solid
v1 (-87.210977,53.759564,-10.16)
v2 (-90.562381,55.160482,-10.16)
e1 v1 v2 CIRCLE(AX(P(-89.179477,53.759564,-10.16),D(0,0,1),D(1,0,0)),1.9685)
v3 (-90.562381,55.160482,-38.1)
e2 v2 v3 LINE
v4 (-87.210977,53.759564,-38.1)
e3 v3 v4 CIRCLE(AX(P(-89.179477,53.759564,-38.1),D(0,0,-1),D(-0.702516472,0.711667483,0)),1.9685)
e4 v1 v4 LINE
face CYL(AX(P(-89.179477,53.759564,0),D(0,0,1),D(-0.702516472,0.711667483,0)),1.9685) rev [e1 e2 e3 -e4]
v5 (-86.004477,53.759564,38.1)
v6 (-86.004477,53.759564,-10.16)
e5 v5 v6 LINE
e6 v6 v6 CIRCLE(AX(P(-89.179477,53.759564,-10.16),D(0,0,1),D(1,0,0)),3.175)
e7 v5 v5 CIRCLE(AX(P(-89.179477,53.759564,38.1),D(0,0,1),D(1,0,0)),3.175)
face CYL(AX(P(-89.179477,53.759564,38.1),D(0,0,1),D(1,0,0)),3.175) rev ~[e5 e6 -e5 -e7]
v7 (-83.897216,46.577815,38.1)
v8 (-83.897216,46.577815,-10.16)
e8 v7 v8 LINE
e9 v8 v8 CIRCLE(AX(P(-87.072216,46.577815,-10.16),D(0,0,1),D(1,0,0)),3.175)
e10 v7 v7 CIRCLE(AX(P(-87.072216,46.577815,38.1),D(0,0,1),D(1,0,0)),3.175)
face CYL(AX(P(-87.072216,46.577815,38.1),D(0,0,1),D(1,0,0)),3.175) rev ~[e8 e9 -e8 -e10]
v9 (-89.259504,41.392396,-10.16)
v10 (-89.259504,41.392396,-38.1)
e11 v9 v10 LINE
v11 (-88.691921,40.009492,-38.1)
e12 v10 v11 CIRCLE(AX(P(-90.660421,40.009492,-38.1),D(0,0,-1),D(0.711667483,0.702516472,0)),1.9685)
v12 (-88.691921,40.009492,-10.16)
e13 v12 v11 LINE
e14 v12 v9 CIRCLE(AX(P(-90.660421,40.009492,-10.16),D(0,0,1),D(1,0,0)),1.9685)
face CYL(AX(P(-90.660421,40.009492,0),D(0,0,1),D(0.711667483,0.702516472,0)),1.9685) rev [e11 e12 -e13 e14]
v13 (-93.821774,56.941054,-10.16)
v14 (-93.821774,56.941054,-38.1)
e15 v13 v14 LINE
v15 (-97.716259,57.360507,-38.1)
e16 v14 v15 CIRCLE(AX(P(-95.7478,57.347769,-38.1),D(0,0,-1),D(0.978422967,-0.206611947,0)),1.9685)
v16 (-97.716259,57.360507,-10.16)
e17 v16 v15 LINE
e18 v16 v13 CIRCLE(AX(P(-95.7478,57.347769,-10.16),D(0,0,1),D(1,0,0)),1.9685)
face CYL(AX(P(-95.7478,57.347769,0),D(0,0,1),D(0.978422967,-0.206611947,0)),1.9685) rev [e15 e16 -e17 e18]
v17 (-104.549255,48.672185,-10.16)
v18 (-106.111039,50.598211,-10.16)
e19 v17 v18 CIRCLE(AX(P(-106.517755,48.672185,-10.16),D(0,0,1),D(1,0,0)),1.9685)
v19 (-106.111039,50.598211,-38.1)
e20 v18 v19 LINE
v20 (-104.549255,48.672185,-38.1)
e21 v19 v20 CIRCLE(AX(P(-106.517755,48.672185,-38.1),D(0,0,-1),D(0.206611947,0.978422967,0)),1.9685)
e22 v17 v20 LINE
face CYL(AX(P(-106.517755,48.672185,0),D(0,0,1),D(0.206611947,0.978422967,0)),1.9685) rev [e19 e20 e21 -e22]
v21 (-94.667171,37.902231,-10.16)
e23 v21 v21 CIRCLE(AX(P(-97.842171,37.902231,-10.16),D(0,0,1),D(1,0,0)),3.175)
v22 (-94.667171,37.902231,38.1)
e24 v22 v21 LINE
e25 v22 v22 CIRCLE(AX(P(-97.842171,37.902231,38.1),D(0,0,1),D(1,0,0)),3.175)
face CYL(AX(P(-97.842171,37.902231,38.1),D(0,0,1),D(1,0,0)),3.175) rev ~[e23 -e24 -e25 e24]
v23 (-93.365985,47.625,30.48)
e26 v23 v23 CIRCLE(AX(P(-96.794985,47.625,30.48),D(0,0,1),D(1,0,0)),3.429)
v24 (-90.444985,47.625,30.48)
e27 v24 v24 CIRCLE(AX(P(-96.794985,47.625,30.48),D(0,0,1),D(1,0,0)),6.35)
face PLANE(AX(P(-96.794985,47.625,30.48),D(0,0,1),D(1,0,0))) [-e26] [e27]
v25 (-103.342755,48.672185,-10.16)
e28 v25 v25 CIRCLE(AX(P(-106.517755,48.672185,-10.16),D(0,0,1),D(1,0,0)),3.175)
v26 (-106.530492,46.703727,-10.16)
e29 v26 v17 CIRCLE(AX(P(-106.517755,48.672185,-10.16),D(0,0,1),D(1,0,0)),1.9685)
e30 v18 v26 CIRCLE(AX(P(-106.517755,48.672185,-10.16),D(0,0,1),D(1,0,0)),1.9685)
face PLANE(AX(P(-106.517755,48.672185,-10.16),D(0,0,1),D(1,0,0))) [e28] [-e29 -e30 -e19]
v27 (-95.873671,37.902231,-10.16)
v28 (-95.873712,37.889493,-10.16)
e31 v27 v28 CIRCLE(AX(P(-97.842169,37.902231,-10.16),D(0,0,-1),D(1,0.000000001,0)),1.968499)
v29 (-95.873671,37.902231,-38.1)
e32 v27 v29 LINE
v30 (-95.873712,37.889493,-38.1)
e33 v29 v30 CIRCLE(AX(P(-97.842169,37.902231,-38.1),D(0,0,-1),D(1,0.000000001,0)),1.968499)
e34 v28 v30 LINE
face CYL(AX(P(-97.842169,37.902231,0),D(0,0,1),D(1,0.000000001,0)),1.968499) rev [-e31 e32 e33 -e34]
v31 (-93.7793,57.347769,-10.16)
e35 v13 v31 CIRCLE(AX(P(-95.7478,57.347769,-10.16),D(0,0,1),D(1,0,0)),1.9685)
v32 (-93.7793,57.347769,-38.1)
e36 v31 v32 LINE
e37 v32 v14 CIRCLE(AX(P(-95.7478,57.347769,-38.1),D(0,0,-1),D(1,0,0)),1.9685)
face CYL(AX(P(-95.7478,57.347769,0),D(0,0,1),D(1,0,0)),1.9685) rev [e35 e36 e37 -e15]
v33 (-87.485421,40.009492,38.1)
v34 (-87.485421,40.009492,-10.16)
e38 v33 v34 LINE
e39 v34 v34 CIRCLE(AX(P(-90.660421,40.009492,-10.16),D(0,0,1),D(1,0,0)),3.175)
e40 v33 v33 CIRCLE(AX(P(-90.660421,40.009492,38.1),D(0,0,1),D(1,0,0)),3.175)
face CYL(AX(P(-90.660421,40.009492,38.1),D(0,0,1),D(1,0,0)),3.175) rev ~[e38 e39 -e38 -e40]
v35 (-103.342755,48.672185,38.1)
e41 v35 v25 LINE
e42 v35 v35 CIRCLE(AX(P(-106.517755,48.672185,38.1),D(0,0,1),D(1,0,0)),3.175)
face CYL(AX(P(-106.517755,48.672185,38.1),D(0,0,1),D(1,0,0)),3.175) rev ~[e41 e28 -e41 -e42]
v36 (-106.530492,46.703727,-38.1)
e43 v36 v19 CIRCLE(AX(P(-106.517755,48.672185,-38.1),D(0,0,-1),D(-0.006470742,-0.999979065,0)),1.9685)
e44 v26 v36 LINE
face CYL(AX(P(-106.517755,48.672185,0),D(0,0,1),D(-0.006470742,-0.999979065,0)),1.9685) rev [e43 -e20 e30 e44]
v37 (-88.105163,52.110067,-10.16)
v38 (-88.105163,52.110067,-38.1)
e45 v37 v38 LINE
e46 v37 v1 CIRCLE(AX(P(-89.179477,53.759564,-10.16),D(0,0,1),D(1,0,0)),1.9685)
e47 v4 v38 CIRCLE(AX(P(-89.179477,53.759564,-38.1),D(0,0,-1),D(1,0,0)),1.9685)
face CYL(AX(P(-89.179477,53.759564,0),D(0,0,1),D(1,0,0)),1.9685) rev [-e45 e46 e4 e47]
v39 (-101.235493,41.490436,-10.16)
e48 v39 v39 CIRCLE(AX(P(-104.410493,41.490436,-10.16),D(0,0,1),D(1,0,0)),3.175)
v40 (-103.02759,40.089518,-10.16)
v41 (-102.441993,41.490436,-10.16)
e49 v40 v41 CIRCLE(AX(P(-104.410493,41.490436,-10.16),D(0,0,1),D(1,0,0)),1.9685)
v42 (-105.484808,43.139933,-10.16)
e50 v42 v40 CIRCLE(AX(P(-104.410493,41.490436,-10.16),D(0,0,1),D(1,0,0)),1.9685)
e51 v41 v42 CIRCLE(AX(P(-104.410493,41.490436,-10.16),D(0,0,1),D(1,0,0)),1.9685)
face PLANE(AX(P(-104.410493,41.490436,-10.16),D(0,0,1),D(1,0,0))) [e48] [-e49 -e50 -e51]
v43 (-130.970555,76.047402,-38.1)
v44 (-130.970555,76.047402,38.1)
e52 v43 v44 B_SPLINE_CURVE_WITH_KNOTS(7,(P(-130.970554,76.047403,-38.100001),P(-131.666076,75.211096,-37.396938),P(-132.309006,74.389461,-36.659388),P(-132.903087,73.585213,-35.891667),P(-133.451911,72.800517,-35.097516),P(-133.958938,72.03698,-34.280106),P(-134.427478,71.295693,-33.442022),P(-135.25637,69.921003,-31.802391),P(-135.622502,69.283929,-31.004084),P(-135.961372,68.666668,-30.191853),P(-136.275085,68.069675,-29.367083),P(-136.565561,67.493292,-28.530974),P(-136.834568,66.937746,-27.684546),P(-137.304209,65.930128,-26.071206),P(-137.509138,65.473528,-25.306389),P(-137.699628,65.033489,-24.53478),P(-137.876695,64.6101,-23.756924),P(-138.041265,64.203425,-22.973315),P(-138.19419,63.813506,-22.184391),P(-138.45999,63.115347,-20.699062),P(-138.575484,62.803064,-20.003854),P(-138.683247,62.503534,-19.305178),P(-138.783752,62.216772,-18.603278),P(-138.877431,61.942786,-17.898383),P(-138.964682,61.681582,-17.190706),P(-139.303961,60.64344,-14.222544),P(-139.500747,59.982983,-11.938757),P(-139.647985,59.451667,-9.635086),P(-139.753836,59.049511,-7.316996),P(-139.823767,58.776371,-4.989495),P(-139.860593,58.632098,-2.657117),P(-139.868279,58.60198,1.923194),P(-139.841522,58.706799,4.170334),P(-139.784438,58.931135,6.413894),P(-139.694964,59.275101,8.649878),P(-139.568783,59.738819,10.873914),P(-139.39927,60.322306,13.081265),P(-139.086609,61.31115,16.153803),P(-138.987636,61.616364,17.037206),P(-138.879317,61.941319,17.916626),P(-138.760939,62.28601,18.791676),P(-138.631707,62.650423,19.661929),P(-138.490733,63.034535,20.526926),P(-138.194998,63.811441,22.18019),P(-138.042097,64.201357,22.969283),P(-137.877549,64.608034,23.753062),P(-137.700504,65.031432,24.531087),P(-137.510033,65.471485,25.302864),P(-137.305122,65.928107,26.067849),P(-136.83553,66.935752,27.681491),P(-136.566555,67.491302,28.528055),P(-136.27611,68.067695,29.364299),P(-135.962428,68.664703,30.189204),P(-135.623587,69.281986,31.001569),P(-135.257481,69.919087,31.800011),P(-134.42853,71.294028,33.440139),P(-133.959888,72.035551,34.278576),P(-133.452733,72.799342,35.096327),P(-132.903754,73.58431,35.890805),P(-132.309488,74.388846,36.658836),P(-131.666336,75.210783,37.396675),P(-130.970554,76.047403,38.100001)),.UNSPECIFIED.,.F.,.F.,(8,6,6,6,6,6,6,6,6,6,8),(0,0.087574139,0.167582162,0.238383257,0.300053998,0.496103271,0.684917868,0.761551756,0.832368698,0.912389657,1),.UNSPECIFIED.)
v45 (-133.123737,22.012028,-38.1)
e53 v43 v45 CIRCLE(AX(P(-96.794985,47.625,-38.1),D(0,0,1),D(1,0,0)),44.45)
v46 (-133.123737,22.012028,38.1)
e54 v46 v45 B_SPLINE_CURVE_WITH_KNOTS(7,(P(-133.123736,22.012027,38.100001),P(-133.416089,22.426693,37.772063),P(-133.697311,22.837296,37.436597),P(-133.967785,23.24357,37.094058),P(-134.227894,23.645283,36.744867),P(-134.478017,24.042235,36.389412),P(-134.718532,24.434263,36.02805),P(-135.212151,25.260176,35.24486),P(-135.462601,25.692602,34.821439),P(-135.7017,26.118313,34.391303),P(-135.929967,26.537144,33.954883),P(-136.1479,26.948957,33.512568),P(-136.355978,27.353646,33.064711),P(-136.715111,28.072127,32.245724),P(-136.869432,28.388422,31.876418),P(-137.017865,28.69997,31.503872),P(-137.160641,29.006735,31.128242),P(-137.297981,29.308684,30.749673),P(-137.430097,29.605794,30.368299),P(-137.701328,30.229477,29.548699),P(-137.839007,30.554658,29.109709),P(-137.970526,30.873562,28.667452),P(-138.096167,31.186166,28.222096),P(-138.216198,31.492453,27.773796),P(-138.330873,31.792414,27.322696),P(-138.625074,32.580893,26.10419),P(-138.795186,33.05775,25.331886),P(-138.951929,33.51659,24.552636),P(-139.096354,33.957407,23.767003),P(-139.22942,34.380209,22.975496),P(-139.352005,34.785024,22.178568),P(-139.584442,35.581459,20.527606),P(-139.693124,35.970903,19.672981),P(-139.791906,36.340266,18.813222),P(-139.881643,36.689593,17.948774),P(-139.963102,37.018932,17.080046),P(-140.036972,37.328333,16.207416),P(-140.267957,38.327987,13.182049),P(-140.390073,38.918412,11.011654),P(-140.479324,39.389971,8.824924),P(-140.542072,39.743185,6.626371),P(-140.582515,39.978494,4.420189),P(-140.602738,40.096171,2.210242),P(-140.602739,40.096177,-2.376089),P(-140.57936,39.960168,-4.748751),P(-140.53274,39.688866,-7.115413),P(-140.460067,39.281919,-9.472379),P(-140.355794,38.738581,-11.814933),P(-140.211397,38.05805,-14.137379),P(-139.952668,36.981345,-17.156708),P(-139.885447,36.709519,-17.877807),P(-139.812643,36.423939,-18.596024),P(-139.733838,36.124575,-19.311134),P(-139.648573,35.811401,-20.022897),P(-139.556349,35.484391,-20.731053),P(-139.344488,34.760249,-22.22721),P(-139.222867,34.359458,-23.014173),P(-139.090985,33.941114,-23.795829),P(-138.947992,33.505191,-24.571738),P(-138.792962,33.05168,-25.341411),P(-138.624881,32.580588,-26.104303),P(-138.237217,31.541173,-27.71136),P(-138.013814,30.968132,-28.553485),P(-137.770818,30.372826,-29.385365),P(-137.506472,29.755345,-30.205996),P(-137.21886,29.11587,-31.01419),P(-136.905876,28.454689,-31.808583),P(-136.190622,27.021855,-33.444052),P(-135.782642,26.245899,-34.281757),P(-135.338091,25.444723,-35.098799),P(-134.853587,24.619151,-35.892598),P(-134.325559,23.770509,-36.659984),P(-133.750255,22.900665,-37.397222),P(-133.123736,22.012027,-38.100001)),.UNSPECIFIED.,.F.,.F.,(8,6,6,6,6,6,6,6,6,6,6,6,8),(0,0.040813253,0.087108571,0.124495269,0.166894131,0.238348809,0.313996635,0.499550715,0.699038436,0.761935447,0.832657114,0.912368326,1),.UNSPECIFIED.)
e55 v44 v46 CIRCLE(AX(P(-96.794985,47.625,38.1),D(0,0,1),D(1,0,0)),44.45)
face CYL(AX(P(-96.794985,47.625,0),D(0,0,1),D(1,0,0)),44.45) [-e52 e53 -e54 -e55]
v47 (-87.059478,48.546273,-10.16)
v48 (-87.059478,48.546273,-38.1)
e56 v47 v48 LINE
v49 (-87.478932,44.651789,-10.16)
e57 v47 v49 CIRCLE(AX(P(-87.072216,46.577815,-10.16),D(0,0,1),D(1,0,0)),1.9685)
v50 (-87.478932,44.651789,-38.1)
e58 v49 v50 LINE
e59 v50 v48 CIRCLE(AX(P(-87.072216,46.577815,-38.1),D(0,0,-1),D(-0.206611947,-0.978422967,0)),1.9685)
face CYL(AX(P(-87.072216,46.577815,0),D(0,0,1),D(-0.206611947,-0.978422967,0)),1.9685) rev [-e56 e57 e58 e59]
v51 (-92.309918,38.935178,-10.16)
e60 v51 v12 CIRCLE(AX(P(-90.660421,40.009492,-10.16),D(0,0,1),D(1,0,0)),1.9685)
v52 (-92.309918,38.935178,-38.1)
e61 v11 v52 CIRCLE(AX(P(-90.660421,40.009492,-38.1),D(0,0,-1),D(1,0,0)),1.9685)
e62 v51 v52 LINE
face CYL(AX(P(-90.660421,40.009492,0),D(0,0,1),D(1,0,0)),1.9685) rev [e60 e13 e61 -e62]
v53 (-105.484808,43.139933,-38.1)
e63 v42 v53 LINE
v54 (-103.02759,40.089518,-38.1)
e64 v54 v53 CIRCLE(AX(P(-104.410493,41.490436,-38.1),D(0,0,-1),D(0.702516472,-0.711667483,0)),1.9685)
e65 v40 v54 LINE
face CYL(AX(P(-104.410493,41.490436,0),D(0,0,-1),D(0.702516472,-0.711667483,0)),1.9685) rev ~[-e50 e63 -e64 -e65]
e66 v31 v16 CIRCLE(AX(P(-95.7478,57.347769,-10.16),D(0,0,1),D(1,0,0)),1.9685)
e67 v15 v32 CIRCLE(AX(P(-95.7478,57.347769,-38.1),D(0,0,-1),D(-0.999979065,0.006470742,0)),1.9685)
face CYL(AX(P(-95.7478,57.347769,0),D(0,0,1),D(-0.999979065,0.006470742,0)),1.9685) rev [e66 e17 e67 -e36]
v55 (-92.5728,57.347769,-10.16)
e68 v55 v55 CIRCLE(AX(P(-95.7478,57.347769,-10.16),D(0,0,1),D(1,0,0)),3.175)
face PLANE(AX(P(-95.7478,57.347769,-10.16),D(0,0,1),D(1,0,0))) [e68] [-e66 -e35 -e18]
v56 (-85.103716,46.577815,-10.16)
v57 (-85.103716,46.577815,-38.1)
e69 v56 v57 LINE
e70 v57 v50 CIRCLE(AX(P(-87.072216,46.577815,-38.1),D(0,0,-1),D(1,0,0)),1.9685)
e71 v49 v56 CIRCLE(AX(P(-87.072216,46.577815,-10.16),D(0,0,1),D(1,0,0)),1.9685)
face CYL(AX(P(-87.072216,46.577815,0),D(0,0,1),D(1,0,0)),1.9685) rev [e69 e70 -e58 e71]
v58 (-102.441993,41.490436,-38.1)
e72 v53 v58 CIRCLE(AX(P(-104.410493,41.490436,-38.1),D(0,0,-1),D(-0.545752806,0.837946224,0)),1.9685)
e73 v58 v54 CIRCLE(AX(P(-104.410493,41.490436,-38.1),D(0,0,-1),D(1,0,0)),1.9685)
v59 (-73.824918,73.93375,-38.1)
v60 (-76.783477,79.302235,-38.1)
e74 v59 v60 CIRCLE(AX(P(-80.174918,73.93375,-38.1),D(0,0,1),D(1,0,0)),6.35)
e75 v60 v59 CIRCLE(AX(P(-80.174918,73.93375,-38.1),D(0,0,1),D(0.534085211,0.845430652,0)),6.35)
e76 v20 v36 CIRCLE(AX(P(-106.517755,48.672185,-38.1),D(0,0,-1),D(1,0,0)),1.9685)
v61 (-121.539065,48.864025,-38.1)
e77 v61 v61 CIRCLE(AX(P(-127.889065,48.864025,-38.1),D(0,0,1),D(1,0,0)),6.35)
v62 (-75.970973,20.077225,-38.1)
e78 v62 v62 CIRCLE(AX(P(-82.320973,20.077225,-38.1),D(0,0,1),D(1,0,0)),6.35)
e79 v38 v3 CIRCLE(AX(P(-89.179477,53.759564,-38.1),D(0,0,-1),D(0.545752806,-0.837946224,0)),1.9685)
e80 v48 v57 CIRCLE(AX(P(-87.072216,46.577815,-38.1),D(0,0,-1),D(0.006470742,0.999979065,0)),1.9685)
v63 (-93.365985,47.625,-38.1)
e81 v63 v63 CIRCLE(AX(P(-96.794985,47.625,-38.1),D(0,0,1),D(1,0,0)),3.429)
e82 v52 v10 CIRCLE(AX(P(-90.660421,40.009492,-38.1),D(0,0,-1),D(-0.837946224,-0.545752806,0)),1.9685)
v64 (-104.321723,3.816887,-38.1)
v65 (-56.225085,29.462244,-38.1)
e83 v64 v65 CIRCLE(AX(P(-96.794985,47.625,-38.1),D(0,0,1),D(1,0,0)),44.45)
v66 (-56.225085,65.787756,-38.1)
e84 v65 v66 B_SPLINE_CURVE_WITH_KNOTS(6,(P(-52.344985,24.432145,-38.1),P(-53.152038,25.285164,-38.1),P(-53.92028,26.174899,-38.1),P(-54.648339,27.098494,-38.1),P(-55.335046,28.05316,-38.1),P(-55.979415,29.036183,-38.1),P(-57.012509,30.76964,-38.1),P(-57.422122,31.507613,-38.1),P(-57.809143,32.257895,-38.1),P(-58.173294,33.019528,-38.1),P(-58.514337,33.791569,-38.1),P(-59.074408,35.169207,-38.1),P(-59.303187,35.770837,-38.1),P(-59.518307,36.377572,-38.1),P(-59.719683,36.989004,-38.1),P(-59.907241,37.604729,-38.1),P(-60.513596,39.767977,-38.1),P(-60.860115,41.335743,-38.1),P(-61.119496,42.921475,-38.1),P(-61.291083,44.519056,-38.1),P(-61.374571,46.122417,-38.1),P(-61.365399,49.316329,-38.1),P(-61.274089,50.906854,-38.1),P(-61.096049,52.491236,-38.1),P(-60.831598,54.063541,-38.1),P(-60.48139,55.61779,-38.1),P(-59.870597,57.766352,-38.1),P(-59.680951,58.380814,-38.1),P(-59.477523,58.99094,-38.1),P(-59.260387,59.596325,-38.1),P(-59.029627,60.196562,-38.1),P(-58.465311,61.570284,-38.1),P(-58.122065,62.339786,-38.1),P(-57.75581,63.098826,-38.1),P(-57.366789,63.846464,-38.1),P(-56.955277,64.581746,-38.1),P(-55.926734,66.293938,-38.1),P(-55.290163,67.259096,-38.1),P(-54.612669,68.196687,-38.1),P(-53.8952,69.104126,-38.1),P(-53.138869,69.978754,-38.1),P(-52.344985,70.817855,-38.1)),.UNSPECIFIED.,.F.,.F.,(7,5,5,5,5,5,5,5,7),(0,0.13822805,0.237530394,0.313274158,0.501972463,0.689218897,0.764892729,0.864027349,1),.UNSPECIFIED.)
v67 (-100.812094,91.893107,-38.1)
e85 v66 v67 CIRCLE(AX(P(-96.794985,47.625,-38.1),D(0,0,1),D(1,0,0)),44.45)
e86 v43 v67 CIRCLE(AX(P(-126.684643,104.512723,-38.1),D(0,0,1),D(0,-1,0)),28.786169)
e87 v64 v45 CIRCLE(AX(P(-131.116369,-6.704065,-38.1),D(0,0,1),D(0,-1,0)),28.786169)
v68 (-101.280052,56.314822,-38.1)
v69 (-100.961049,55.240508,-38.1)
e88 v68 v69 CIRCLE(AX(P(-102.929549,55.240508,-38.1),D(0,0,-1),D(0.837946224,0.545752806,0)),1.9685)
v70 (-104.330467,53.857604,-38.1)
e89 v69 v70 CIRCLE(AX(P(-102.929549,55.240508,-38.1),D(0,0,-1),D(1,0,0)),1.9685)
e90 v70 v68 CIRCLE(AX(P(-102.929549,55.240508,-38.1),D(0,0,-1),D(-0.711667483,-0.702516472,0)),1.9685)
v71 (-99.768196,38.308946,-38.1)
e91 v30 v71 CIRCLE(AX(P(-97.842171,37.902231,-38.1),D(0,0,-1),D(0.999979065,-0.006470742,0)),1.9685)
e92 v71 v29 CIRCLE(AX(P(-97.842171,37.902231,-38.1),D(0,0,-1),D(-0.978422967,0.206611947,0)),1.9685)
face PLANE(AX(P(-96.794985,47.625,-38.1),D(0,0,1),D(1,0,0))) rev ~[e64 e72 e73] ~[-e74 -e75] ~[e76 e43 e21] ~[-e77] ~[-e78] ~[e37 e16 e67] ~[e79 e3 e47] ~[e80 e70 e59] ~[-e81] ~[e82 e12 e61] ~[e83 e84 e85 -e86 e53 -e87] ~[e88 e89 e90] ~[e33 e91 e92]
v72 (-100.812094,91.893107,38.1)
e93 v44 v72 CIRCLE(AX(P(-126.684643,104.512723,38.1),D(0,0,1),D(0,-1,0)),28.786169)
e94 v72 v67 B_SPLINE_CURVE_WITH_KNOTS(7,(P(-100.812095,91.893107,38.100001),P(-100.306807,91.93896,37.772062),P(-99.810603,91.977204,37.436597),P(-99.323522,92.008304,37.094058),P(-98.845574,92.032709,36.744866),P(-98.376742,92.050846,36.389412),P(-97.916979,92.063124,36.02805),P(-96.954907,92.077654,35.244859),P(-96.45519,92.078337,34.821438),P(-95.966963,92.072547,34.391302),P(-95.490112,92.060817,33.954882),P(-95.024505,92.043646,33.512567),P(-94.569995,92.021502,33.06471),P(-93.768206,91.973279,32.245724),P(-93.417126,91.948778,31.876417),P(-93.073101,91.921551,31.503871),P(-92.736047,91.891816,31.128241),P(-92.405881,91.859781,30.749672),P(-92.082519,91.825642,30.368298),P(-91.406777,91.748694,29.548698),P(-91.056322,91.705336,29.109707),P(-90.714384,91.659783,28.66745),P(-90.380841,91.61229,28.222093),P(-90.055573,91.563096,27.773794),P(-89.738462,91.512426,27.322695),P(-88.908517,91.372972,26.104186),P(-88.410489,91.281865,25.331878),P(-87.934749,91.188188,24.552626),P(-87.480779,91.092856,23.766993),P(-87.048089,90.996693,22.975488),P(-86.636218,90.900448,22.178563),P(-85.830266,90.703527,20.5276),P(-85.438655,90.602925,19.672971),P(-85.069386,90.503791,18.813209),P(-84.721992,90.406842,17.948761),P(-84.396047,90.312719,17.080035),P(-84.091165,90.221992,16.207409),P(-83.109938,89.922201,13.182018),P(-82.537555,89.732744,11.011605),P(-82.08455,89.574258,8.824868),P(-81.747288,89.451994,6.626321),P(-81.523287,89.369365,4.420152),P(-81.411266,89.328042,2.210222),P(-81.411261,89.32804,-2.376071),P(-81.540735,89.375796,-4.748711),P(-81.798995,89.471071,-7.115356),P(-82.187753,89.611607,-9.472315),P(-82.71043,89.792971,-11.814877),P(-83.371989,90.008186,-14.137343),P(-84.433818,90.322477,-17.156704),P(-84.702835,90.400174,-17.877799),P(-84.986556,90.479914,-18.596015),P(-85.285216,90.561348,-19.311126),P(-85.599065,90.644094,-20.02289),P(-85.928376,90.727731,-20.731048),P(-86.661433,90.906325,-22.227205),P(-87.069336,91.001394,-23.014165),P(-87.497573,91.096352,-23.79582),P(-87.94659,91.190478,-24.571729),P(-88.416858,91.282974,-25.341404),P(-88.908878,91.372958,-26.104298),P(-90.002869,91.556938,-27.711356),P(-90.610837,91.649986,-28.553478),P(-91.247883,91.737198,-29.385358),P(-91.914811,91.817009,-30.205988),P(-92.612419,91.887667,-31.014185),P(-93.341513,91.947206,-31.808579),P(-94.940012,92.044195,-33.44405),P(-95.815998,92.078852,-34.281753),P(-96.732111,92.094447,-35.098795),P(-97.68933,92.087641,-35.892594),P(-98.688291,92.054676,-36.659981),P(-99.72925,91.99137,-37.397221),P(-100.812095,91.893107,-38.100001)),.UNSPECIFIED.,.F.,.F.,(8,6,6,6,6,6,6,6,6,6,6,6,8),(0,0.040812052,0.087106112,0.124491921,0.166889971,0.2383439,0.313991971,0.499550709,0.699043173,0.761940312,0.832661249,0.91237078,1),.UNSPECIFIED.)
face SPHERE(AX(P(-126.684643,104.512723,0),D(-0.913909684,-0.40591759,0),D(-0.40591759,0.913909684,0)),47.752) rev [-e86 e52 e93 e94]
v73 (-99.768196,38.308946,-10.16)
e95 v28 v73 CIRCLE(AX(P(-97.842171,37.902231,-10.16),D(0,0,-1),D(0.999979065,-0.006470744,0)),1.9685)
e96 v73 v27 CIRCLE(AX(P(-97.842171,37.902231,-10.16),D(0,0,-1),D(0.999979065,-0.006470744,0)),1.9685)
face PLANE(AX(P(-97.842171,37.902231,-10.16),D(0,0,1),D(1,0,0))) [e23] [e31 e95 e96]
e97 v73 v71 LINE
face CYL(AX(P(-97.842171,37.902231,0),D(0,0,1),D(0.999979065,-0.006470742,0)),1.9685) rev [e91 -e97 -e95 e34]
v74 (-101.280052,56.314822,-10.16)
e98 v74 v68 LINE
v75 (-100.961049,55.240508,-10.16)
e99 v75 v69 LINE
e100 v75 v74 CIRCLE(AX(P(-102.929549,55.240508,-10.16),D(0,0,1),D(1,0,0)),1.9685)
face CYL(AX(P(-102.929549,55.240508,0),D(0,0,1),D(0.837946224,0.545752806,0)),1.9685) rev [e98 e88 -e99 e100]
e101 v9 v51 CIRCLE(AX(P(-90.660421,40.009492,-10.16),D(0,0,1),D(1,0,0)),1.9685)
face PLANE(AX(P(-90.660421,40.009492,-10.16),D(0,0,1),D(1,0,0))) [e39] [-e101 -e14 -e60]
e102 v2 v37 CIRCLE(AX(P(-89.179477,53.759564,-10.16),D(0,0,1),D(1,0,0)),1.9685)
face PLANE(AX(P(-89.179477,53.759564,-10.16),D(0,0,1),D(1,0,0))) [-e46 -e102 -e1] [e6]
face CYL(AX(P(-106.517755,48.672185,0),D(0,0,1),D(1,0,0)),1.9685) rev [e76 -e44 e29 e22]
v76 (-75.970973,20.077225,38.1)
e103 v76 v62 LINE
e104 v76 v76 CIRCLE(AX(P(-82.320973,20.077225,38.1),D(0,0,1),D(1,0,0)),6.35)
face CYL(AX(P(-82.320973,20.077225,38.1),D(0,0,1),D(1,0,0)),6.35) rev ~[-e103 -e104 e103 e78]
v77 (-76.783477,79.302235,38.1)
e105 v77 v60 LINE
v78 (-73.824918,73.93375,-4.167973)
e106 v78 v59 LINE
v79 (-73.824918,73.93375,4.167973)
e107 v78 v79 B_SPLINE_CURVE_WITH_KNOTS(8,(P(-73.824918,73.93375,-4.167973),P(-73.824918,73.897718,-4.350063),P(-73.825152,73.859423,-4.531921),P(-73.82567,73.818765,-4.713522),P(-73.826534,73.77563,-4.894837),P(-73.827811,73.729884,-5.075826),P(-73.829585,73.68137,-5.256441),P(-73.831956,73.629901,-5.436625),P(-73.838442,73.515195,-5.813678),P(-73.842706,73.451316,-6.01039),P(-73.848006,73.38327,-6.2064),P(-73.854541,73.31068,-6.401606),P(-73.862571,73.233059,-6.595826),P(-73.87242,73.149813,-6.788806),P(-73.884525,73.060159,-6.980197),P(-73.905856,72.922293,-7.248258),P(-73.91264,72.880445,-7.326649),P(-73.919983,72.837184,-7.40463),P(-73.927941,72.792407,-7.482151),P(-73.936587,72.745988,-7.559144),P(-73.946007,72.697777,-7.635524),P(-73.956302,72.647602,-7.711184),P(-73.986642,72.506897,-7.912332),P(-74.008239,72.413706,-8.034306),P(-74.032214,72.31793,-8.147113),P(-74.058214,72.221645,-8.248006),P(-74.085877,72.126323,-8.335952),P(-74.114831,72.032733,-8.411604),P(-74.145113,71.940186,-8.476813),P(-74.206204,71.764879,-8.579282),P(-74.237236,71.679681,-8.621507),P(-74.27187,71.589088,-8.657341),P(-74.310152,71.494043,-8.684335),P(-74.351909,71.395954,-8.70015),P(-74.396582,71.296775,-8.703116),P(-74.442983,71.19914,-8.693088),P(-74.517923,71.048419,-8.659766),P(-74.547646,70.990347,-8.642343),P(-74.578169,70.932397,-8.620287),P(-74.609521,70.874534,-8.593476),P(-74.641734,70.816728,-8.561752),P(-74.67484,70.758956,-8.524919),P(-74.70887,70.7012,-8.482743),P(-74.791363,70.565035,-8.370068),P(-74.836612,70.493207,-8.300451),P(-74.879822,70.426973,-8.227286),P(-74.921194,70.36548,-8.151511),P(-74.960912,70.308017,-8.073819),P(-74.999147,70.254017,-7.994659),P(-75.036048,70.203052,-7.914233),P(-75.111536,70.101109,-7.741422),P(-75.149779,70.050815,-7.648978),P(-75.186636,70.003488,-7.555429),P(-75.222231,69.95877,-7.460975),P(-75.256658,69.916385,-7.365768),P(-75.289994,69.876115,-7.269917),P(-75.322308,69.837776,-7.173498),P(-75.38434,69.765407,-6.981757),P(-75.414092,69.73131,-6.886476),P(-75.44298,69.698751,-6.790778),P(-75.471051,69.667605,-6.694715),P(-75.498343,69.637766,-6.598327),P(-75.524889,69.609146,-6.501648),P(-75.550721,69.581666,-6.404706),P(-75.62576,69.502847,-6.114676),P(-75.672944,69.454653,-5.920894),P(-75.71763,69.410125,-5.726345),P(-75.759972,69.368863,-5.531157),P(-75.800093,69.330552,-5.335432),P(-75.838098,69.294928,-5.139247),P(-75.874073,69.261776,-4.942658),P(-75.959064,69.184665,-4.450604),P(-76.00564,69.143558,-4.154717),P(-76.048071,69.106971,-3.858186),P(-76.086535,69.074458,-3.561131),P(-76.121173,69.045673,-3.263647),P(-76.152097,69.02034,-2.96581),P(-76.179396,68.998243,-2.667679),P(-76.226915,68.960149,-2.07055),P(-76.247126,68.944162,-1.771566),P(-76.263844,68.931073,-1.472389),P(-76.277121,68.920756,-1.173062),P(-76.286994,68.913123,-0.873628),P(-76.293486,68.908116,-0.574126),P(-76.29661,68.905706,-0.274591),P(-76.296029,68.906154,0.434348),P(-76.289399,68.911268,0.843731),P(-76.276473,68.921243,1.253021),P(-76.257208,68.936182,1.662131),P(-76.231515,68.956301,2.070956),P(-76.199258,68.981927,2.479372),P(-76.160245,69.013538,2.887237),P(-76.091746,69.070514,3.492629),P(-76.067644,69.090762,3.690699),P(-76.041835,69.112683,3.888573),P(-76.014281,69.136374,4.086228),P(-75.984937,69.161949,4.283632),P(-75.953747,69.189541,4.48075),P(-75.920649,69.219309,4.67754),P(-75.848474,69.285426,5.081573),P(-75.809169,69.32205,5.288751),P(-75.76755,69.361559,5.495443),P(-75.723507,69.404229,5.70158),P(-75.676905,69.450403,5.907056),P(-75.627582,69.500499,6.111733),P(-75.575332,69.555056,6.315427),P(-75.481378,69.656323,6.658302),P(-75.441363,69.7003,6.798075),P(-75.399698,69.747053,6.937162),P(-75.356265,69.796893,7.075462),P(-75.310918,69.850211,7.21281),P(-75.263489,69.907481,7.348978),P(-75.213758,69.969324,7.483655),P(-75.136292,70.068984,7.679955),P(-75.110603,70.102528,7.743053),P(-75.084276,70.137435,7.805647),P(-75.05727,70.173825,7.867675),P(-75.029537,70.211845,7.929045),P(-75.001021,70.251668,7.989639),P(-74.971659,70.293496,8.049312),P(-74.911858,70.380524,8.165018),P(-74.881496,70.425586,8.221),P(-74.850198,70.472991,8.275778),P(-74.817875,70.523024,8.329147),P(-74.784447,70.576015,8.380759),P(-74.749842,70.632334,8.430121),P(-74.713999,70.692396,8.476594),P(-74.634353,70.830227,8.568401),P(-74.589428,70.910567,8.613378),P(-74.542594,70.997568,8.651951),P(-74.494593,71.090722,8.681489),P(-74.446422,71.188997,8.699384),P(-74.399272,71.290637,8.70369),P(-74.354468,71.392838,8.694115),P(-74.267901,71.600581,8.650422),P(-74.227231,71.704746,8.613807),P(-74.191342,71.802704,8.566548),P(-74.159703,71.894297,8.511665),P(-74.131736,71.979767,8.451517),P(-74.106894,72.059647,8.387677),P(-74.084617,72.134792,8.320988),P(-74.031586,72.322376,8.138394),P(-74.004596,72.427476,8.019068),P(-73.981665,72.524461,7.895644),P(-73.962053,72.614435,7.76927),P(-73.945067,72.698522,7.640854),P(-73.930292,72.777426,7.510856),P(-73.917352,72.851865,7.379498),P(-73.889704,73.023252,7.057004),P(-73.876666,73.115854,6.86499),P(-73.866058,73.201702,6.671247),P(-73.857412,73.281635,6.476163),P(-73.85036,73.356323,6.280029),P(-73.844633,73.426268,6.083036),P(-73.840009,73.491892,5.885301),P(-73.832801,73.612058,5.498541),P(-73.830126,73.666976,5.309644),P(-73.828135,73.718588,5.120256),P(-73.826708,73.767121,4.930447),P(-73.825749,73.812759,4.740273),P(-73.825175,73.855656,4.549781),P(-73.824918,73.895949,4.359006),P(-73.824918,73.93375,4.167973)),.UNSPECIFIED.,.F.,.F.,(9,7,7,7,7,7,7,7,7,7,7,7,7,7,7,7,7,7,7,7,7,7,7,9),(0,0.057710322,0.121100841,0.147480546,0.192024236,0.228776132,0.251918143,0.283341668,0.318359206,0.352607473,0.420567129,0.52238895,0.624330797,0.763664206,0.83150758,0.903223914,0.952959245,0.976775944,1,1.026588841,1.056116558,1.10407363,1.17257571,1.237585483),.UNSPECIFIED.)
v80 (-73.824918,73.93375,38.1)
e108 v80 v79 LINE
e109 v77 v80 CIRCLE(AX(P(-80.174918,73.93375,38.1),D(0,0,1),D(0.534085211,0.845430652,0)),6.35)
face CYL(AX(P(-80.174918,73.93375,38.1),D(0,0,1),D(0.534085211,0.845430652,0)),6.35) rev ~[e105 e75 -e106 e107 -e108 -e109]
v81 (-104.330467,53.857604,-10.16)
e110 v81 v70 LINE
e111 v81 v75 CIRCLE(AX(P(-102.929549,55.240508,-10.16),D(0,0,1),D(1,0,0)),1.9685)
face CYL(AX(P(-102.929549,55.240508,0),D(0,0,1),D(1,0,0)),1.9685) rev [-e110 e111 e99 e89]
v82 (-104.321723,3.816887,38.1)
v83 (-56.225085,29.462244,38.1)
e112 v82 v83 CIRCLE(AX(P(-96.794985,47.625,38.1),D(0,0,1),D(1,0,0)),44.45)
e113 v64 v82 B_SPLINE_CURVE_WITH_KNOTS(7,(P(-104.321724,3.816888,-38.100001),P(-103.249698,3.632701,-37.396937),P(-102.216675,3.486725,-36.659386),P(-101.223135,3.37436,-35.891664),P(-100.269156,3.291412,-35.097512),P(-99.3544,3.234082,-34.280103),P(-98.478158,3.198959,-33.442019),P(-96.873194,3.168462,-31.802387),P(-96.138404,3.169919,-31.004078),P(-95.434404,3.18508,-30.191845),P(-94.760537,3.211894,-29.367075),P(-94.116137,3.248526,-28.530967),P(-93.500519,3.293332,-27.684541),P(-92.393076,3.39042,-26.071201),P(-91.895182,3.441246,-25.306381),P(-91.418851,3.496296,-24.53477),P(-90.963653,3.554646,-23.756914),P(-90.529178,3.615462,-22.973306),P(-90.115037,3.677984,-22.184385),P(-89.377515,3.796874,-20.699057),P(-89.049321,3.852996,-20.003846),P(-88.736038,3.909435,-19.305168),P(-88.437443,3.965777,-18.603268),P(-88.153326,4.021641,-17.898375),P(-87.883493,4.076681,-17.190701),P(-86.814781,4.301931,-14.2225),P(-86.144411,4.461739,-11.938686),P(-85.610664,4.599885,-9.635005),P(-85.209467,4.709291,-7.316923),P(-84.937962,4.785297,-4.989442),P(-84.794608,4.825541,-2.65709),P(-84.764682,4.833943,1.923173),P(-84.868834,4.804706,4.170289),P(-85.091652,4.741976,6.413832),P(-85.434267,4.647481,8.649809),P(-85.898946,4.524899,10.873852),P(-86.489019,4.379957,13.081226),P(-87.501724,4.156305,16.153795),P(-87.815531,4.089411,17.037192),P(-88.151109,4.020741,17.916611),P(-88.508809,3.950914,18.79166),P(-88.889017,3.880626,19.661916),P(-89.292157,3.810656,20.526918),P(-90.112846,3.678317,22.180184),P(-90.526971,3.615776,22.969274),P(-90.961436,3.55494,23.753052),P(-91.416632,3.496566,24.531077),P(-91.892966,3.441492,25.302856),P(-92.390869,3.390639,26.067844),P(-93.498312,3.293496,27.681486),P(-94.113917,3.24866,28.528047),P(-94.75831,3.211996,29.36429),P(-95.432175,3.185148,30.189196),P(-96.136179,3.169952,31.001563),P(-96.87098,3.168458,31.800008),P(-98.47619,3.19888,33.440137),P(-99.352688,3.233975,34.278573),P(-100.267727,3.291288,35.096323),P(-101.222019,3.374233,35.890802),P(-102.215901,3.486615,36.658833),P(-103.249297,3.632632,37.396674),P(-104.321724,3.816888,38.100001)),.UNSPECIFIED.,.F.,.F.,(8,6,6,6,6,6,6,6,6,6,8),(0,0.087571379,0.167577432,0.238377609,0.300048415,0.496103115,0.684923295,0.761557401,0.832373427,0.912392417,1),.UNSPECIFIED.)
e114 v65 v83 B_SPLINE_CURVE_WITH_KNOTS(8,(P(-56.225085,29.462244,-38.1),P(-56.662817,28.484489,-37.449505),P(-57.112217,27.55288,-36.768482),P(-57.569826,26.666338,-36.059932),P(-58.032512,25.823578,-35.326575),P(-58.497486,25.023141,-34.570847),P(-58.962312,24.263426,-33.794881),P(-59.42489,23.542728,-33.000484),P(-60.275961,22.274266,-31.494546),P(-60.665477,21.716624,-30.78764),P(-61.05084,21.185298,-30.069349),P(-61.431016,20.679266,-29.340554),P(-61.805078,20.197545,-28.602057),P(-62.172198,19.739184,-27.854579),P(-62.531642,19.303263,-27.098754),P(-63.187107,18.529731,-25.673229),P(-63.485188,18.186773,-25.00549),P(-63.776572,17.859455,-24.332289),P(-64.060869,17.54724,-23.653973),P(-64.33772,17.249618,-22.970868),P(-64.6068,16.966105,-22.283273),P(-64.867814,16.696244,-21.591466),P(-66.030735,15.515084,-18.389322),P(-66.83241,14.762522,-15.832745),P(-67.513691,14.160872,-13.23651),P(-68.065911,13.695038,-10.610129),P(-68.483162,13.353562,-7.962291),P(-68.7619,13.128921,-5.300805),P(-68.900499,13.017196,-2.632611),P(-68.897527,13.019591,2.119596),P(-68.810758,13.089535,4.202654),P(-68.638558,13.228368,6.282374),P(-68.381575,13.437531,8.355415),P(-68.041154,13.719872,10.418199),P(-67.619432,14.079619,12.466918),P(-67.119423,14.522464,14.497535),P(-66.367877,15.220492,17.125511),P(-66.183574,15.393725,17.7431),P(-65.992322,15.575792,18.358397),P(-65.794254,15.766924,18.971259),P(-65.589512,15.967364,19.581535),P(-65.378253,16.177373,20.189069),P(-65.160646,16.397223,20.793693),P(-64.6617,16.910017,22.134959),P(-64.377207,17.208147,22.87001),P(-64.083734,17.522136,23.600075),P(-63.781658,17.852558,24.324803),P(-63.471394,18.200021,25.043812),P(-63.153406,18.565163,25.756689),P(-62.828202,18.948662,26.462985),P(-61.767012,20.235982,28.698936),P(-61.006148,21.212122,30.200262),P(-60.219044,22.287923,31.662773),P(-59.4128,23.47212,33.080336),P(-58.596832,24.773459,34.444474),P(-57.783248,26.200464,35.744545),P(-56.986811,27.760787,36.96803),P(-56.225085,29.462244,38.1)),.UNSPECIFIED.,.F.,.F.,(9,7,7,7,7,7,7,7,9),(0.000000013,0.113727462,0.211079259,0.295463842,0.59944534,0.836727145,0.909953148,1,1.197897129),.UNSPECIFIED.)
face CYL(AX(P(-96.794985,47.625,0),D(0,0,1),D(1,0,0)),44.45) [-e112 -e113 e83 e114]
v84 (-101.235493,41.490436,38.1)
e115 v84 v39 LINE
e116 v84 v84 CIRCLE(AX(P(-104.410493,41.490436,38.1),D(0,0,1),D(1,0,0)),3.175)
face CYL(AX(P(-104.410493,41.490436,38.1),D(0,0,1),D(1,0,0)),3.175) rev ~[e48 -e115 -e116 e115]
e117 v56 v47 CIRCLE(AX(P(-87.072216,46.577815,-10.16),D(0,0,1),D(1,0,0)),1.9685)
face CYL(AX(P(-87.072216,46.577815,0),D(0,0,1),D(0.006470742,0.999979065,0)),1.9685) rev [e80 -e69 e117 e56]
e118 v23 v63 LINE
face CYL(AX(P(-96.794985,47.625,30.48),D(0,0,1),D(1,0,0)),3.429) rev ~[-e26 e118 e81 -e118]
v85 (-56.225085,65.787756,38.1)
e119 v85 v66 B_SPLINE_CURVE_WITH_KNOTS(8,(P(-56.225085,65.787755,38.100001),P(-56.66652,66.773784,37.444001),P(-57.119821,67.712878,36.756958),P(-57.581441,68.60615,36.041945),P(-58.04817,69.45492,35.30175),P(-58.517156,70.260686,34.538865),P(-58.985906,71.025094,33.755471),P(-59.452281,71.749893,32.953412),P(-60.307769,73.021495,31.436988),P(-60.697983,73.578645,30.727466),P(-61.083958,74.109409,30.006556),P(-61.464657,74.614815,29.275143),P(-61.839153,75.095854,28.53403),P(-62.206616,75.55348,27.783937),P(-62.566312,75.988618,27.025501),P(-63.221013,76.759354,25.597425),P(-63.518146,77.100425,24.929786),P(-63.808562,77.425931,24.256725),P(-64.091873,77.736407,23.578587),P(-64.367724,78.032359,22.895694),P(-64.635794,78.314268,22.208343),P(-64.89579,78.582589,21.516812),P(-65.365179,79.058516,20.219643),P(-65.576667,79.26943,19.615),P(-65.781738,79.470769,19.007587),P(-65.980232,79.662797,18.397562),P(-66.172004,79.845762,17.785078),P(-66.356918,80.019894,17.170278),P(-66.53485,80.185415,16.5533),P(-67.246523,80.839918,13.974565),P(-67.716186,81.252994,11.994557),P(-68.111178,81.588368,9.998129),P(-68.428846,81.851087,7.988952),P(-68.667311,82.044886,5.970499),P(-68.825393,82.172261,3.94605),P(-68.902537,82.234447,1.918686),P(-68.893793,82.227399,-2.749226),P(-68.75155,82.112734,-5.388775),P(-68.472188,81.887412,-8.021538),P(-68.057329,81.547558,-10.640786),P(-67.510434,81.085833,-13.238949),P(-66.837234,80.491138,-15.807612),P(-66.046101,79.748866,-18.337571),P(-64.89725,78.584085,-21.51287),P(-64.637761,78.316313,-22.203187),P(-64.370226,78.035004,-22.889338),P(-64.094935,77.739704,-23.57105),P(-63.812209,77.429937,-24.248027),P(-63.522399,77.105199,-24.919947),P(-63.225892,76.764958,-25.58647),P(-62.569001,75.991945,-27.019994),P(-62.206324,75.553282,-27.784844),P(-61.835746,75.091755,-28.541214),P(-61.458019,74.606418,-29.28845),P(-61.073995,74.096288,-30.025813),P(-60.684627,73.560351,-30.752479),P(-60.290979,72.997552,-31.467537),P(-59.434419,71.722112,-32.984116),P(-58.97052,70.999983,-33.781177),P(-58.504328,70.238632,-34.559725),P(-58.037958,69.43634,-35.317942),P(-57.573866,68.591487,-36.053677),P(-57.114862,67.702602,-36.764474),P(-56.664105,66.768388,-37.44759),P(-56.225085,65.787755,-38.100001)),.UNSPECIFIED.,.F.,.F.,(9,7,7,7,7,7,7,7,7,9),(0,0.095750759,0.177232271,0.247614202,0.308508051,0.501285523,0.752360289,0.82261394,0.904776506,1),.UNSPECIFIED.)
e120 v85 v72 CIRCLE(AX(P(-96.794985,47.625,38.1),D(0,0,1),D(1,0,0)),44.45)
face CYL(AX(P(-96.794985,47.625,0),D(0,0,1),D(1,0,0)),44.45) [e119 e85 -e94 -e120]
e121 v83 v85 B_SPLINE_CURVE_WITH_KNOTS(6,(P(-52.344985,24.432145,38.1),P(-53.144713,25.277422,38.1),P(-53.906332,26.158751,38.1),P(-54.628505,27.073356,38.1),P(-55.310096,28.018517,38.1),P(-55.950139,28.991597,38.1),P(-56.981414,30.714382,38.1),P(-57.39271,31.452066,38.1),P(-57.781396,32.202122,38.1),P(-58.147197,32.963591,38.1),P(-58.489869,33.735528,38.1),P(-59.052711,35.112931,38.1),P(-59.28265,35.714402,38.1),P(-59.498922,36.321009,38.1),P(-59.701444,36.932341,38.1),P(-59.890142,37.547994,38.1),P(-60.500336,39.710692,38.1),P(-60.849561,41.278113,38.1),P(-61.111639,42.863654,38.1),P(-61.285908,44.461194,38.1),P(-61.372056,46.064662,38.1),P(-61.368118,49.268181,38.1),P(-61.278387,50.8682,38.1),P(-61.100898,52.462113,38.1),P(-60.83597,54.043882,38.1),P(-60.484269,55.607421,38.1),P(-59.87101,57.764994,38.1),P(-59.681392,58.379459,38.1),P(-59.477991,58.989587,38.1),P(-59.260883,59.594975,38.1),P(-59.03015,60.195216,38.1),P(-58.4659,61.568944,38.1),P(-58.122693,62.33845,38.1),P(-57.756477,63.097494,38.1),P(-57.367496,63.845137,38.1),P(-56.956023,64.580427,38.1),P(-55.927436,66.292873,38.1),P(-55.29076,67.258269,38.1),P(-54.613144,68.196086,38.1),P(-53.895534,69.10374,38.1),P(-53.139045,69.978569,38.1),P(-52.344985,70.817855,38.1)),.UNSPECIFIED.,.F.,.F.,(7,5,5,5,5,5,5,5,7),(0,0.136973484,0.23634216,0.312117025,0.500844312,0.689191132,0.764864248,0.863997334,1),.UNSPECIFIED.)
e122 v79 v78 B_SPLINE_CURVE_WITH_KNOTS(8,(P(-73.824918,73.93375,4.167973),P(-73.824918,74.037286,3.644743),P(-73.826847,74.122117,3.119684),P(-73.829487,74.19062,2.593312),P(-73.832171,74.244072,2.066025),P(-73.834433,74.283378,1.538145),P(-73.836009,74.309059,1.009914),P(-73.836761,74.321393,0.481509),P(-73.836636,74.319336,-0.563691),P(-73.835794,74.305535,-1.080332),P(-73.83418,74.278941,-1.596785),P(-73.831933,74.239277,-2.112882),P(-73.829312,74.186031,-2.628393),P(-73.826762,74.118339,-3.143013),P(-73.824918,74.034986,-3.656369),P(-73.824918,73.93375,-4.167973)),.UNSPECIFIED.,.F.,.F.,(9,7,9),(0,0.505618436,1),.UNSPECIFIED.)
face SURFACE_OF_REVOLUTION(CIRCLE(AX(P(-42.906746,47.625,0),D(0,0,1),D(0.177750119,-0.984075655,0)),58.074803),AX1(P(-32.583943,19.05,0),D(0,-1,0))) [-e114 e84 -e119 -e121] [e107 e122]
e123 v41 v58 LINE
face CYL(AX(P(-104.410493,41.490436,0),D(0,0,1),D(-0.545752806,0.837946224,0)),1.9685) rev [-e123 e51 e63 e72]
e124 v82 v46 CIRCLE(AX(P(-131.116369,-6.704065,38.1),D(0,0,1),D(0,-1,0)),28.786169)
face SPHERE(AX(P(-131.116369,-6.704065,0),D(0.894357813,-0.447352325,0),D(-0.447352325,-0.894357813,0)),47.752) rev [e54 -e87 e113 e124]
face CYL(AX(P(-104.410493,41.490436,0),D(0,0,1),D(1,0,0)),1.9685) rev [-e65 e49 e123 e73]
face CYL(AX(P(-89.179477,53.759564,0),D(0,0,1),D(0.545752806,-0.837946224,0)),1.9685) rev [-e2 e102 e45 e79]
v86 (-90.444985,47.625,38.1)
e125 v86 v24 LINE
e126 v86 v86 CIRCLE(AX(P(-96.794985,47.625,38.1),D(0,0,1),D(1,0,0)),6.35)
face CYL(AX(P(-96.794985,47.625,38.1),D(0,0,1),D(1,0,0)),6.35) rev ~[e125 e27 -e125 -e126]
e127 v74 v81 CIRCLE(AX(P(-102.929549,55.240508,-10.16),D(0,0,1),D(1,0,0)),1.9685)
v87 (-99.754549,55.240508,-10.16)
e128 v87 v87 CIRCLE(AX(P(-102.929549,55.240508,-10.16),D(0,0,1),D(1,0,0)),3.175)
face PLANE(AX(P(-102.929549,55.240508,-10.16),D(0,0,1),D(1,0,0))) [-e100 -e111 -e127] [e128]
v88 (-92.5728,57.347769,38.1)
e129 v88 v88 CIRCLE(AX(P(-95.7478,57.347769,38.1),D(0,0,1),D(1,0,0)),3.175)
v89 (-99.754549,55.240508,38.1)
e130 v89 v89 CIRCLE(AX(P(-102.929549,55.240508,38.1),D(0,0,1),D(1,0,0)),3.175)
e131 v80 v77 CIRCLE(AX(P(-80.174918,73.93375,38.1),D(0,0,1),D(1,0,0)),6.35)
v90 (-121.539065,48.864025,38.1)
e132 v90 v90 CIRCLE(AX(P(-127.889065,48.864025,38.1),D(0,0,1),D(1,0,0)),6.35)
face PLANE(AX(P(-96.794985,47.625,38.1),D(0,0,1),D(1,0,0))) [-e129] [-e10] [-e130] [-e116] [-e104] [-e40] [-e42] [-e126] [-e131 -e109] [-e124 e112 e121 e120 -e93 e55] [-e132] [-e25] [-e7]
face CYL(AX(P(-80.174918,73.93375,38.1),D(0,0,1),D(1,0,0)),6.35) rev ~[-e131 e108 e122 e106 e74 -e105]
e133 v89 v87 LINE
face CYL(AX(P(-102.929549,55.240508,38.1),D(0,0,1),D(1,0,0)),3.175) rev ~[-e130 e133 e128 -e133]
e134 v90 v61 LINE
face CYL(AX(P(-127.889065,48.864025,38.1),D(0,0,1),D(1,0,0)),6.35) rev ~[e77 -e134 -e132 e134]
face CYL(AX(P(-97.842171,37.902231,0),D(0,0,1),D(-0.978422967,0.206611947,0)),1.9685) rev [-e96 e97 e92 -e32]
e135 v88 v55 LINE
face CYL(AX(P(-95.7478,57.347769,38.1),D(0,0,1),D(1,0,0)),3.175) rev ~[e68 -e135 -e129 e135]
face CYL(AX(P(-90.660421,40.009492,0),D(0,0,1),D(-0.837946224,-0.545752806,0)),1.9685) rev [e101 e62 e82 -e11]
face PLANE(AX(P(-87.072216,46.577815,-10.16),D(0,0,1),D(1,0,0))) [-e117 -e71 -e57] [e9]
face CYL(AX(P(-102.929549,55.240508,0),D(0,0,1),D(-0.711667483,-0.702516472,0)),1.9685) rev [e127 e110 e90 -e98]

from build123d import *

# Parameters (mm, degrees)
F0_R          = 44.45
F0_R_2        = 16.51
F1_DEPTH      = 38.1
F1_DEPTH_BACK = 38.1
F8_R          = 3.175
F8_R_2        = 1.9685
F9_DEPTH      = 48.26
F10_R         = 6.35
F11_DEPTH     = 7.62
F12_R         = 3.429
F13_DEPTH     = 68.58
F14_R         = 6.35
F15_DEPTH     = 76.2


# Not quite as in the source:
# - a feature names something its author has since deleted; it is built from what else it names


with BuildPart() as f1:
    # F0 (on Top) → F1 (new body, two sides)
    with BuildSketch(Plane.XY) as f1_sk:
        with Locations((-96.7949852347, 47.625)):
            Circle(F0_R)
        with Locations((-96.7949852347, 47.625)):
            Circle(F0_R_2, mode=Mode.SUBTRACT)
        with Locations((-96.7949852347, 47.625)):
            Circle(F0_R_2)
        with BuildLine():
            ThreePointArc((-88.1051627648, 52.1100670498), (-87.4115771175, 50.37826953), (-87.0594782396, 48.5462733292))
            ThreePointArc((-87.0594782396, 48.5462733292), (-85.6757800173, 47.965243489), (-85.103715896, 46.5778145407))
            ThreePointArc((-85.103715896, 46.5778145407), (-85.8323827306, 45.0488259953), (-87.478931514, 44.6517889292))
            ThreePointArc((-87.478931514, 44.6517889292), (-88.2130581693, 42.9367840447), (-89.2595036018, 41.3923956038))
            ThreePointArc((-89.2595036018, 41.3923956038), (-88.839336444, 40.7569162622), (-88.6919210429, 40.0094919292))
            ThreePointArc((-88.6919210429, 40.0094919292), (-90.1000831422, 38.1224270954), (-92.309918185, 38.9351775301))
            ThreePointArc((-92.309918185, 38.9351775301), (-94.0417157047, 38.2415918827), (-95.8737119056, 37.8894930048))
            ThreePointArc((-95.8737119056, 37.8894930048), (-98.0529677671, 35.9450498204), (-99.7681963056, 38.3089462792))
            ThreePointArc((-99.7681963056, 38.3089462792), (-101.48320119, 39.0430729345), (-103.0275896309, 40.089518367))
            ThreePointArc((-103.0275896309, 40.089518367), (-105.9434851899, 40.2555560033), (-105.4848077047, 43.1399329502))
            ThreePointArc((-105.4848077047, 43.1399329502), (-106.178393352, 44.87173047), (-106.5304922299, 46.7037266708))
            ThreePointArc((-106.5304922299, 46.7037266708), (-108.4749354144, 48.8829825323), (-106.1110389555, 50.5982110708))
            ThreePointArc((-106.1110389555, 50.5982110708), (-105.3769123002, 52.3132159553), (-104.3304668677, 53.8576043962))
            ThreePointArc((-104.3304668677, 53.8576043962), (-104.1644292314, 56.7734999551), (-101.2800522845, 56.3148224699))
            ThreePointArc((-101.2800522845, 56.3148224699), (-99.5482547647, 57.0084081173), (-97.7162585639, 57.3605069952))
            ThreePointArc((-97.7162585639, 57.3605069952), (-95.7414309138, 59.3162590358), (-93.7792997754, 57.3477693387))
            ThreePointArc((-93.7792997754, 57.3477693387), (-93.7899471678, 57.1433056087), (-93.8217741639, 56.9410537208))
            ThreePointArc((-93.8217741639, 56.9410537208), (-92.1067692795, 56.2069270655), (-90.5623808386, 55.160481633))
            ThreePointArc((-90.5623808386, 55.160481633), (-88.4202847093, 55.5757742752), (-87.210977164, 53.7595641919))
            ThreePointArc((-87.210977164, 53.7595641919), (-87.4489020941, 52.8214265806), (-88.1051627648, 52.1100670498))
        make_face(mode=Mode.SUBTRACT)
        with BuildLine():
            ThreePointArc((-87.478931514, 44.6517889292), (-89.0293967369, 46.7886116136), (-87.0594782396, 48.5462733292))
            ThreePointArc((-87.0594782396, 48.5462733292), (-87.4115771175, 50.37826953), (-88.1051627648, 52.1100670498))
            ThreePointArc((-88.1051627648, 52.1100670498), (-90.7124690483, 52.524684387), (-90.5623808386, 55.160481633))
            ThreePointArc((-90.5623808386, 55.160481633), (-92.1067692795, 56.2069270655), (-93.8217741639, 56.9410537208))
            ThreePointArc((-93.8217741639, 56.9410537208), (-95.9585968484, 55.3905884978), (-97.7162585639, 57.3605069952))
            ThreePointArc((-97.7162585639, 57.3605069952), (-99.5482547647, 57.0084081173), (-101.2800522845, 56.3148224699))
            ThreePointArc((-101.2800522845, 56.3148224699), (-101.0424845928, 55.8008459714), (-100.9610494266, 55.2405080708))
            ThreePointArc((-100.9610494266, 55.2405080708), (-102.1821250936, 53.4194234719), (-104.3304668677, 53.8576043962))
            ThreePointArc((-104.3304668677, 53.8576043962), (-105.3769123002, 52.3132159553), (-106.1110389555, 50.5982110708))
            ThreePointArc((-106.1110389555, 50.5982110708), (-104.988766028, 49.9120186247), (-104.5492545734, 48.6721854593))
            ThreePointArc((-104.5492545734, 48.6721854593), (-105.1303256251, 47.2757495806), (-106.5304922299, 46.7037266708))
            ThreePointArc((-106.5304922299, 46.7037266708), (-106.178393352, 44.87173047), (-105.4848077047, 43.1399329502))
            ThreePointArc((-105.4848077047, 43.1399329502), (-103.4723556943, 43.221010878), (-102.4419933055, 41.4904358081))
            ThreePointArc((-102.4419933055, 41.4904358081), (-102.5942832222, 40.7312433534), (-103.0275896309, 40.089518367))
            ThreePointArc((-103.0275896309, 40.089518367), (-101.48320119, 39.0430729345), (-99.7681963056, 38.3089462792))
            ThreePointArc((-99.7681963056, 38.3089462792), (-97.6377069641, 39.8600832689), (-95.8736706941, 37.9022306613))
            ThreePointArc((-95.8736706941, 37.9022306613), (-95.873680997, 37.8958617997), (-95.8737119056, 37.8894930048))
            ThreePointArc((-95.8737119056, 37.8894930048), (-94.0417157047, 38.2415918827), (-92.309918185, 38.9351775301))
            ThreePointArc((-92.309918185, 38.9351775301), (-91.8953008477, 41.5424838136), (-89.2595036018, 41.3923956038))
            ThreePointArc((-89.2595036018, 41.3923956038), (-88.2130581693, 42.9367840447), (-87.478931514, 44.6517889292))
        make_face()
    extrude(amount=F1_DEPTH)
    extrude(f1_sk.sketch, amount=-F1_DEPTH_BACK)

    # F2 (on Top) → F3 (revolve, cut)
    with BuildSketch(Plane.XY):
        with BuildLine():
            Line((-32.5839432458, 95.377), (-32.5839432458, 47.625))
            Line((-32.5839432458, 47.625), (-32.5839432458, -0.127))
            Line((-32.5839432458, -0.127), (-32.5839432458, -9.525))
            ThreePointArc((-32.5839432458, -9.525), (15.1680567542, 47.625), (-32.5839432458, 104.775))
            Line((-32.5839432458, 104.775), (-32.5839432458, 95.377))
        make_face()
    revolve(axis=Axis((-32.5839432458, 19.05, 0), (0, -1, 0)), mode=Mode.SUBTRACT)

    # F4 (on Top) → F5 (revolve, cut)
    with BuildSketch(Plane.XY):
        with BuildLine():
            Line((-88.4089947582, -28.0660327723), (-131.1163690465, -6.7040645718))
            Line((-131.1163690465, -6.7040645718), (-173.8237433348, 14.6579036287))
            ThreePointArc((-173.8237433348, 14.6579036287), (-152.478337247, -49.4114388601), (-88.4089947582, -28.0660327723))
        make_face()
    revolve(axis=Axis((-152.4700561907, 3.9769195285, 0), (-0.894357813, 0.4473523245, 0)), mode=Mode.SUBTRACT)

    # F6 (on Top) → F7 (revolve, cut)
    with BuildSketch(Plane.XY):
        with BuildLine():
            ThreePointArc((-83.0436281881, 123.89609931), (-146.068020162, 148.1537377837), (-170.3256586357, 85.1293458098))
            Line((-170.3256586357, 85.1293458098), (-126.6846434119, 104.5127225599))
            Line((-126.6846434119, 104.5127225599), (-83.0436281881, 123.89609931))
        make_face()
    revolve(axis=Axis((-148.5051510238, 94.8210341849, 0), (0.9139096839, 0.4059175898, 0)), mode=Mode.SUBTRACT)

    # F8 (on face) → F9 (cut)
    with BuildSketch(Plane.XY.offset(38.1)):
        with Locations((-102.9295494266, 55.2405080708)):
            Circle(F8_R)
        with Locations((-102.9295494266, 55.2405080708)):
            Circle(F8_R_2, mode=Mode.SUBTRACT)
        with Locations((-95.7477997754, 57.3477693387)):
            Circle(F8_R)
        with Locations((-95.7477997754, 57.3477693387)):
            Circle(F8_R_2, mode=Mode.SUBTRACT)
        with Locations((-89.179477164, 53.7595641919)):
            Circle(F8_R)
        with Locations((-89.179477164, 53.7595641919)):
            Circle(F8_R_2, mode=Mode.SUBTRACT)
        with Locations((-87.072215896, 46.5778145407)):
            Circle(F8_R)
        with Locations((-87.072215896, 46.5778145407)):
            Circle(F8_R_2, mode=Mode.SUBTRACT)
        with Locations((-90.6604210429, 40.0094919292)):
            Circle(F8_R)
        with Locations((-90.6604210429, 40.0094919292)):
            Circle(F8_R_2, mode=Mode.SUBTRACT)
        with Locations((-97.8421706941, 37.9022306613)):
            Circle(F8_R)
        with BuildLine():
            ThreePointArc((-95.8736706941, 37.9022306613), (-95.873680997, 37.8958617997), (-95.8737119056, 37.8894930048))
            ThreePointArc((-95.8737119056, 37.8894930048), (-99.8106603912, 37.9085995228), (-95.8736706941, 37.9022306613))
        make_face(mode=Mode.SUBTRACT)
        with Locations((-104.4104933055, 41.4904358081)):
            Circle(F8_R)
        with Locations((-104.4104933055, 41.4904358081)):
            Circle(F8_R_2, mode=Mode.SUBTRACT)
        with Locations((-106.5177545734, 48.6721854593)):
            Circle(F8_R)
        with Locations((-106.5177545734, 48.6721854593)):
            Circle(F8_R_2, mode=Mode.SUBTRACT)
    extrude(amount=-F9_DEPTH, mode=Mode.SUBTRACT)

    # F10 (on face) → F11 (cut)
    with BuildSketch(Plane.XY.offset(38.1)):
        with Locations((-96.7949852347, 47.625)):
            Circle(F10_R)
    extrude(amount=-F11_DEPTH, mode=Mode.SUBTRACT)

    # F12 (on face) → F13 (cut, through all)
    with BuildSketch(Plane.XY.offset(30.48)):
        with Locations((-96.7949852347, 47.625)):
            Circle(F12_R)
    extrude(amount=-F13_DEPTH, mode=Mode.SUBTRACT)

    # F14 (on face) → F15 (cut, through all)
    with BuildSketch(Plane.XY.offset(38.1)):
        with Locations((-127.8890646346, 48.8640254414)):
            Circle(F14_R)
        with BuildLine():
            ThreePointArc((-76.7834769385, 79.3022345884), (-85.5434026681, 77.325191035), (-83.5663591148, 68.5652653054))
            Line((-83.5663591148, 68.5652653054), (-76.7834769385, 79.3022345884))
        make_face()
        with BuildLine():
            Line((-76.7834769385, 79.3022345884), (-83.5663591148, 68.5652653054))
            ThreePointArc((-83.5663591148, 68.5652653054), (-77.1100486093, 68.3723584434), (-73.8249180267, 73.9337499469))
            ThreePointArc((-73.8249180267, 73.9337499469), (-74.6135265232, 76.9986193642), (-76.7834769385, 79.3022345884))
        make_face()
        with Locations((-82.3209730429, 20.0772246117)):
            Circle(F14_R)
    extrude(amount=-F15_DEPTH, mode=Mode.SUBTRACT)


solid = f1.part
